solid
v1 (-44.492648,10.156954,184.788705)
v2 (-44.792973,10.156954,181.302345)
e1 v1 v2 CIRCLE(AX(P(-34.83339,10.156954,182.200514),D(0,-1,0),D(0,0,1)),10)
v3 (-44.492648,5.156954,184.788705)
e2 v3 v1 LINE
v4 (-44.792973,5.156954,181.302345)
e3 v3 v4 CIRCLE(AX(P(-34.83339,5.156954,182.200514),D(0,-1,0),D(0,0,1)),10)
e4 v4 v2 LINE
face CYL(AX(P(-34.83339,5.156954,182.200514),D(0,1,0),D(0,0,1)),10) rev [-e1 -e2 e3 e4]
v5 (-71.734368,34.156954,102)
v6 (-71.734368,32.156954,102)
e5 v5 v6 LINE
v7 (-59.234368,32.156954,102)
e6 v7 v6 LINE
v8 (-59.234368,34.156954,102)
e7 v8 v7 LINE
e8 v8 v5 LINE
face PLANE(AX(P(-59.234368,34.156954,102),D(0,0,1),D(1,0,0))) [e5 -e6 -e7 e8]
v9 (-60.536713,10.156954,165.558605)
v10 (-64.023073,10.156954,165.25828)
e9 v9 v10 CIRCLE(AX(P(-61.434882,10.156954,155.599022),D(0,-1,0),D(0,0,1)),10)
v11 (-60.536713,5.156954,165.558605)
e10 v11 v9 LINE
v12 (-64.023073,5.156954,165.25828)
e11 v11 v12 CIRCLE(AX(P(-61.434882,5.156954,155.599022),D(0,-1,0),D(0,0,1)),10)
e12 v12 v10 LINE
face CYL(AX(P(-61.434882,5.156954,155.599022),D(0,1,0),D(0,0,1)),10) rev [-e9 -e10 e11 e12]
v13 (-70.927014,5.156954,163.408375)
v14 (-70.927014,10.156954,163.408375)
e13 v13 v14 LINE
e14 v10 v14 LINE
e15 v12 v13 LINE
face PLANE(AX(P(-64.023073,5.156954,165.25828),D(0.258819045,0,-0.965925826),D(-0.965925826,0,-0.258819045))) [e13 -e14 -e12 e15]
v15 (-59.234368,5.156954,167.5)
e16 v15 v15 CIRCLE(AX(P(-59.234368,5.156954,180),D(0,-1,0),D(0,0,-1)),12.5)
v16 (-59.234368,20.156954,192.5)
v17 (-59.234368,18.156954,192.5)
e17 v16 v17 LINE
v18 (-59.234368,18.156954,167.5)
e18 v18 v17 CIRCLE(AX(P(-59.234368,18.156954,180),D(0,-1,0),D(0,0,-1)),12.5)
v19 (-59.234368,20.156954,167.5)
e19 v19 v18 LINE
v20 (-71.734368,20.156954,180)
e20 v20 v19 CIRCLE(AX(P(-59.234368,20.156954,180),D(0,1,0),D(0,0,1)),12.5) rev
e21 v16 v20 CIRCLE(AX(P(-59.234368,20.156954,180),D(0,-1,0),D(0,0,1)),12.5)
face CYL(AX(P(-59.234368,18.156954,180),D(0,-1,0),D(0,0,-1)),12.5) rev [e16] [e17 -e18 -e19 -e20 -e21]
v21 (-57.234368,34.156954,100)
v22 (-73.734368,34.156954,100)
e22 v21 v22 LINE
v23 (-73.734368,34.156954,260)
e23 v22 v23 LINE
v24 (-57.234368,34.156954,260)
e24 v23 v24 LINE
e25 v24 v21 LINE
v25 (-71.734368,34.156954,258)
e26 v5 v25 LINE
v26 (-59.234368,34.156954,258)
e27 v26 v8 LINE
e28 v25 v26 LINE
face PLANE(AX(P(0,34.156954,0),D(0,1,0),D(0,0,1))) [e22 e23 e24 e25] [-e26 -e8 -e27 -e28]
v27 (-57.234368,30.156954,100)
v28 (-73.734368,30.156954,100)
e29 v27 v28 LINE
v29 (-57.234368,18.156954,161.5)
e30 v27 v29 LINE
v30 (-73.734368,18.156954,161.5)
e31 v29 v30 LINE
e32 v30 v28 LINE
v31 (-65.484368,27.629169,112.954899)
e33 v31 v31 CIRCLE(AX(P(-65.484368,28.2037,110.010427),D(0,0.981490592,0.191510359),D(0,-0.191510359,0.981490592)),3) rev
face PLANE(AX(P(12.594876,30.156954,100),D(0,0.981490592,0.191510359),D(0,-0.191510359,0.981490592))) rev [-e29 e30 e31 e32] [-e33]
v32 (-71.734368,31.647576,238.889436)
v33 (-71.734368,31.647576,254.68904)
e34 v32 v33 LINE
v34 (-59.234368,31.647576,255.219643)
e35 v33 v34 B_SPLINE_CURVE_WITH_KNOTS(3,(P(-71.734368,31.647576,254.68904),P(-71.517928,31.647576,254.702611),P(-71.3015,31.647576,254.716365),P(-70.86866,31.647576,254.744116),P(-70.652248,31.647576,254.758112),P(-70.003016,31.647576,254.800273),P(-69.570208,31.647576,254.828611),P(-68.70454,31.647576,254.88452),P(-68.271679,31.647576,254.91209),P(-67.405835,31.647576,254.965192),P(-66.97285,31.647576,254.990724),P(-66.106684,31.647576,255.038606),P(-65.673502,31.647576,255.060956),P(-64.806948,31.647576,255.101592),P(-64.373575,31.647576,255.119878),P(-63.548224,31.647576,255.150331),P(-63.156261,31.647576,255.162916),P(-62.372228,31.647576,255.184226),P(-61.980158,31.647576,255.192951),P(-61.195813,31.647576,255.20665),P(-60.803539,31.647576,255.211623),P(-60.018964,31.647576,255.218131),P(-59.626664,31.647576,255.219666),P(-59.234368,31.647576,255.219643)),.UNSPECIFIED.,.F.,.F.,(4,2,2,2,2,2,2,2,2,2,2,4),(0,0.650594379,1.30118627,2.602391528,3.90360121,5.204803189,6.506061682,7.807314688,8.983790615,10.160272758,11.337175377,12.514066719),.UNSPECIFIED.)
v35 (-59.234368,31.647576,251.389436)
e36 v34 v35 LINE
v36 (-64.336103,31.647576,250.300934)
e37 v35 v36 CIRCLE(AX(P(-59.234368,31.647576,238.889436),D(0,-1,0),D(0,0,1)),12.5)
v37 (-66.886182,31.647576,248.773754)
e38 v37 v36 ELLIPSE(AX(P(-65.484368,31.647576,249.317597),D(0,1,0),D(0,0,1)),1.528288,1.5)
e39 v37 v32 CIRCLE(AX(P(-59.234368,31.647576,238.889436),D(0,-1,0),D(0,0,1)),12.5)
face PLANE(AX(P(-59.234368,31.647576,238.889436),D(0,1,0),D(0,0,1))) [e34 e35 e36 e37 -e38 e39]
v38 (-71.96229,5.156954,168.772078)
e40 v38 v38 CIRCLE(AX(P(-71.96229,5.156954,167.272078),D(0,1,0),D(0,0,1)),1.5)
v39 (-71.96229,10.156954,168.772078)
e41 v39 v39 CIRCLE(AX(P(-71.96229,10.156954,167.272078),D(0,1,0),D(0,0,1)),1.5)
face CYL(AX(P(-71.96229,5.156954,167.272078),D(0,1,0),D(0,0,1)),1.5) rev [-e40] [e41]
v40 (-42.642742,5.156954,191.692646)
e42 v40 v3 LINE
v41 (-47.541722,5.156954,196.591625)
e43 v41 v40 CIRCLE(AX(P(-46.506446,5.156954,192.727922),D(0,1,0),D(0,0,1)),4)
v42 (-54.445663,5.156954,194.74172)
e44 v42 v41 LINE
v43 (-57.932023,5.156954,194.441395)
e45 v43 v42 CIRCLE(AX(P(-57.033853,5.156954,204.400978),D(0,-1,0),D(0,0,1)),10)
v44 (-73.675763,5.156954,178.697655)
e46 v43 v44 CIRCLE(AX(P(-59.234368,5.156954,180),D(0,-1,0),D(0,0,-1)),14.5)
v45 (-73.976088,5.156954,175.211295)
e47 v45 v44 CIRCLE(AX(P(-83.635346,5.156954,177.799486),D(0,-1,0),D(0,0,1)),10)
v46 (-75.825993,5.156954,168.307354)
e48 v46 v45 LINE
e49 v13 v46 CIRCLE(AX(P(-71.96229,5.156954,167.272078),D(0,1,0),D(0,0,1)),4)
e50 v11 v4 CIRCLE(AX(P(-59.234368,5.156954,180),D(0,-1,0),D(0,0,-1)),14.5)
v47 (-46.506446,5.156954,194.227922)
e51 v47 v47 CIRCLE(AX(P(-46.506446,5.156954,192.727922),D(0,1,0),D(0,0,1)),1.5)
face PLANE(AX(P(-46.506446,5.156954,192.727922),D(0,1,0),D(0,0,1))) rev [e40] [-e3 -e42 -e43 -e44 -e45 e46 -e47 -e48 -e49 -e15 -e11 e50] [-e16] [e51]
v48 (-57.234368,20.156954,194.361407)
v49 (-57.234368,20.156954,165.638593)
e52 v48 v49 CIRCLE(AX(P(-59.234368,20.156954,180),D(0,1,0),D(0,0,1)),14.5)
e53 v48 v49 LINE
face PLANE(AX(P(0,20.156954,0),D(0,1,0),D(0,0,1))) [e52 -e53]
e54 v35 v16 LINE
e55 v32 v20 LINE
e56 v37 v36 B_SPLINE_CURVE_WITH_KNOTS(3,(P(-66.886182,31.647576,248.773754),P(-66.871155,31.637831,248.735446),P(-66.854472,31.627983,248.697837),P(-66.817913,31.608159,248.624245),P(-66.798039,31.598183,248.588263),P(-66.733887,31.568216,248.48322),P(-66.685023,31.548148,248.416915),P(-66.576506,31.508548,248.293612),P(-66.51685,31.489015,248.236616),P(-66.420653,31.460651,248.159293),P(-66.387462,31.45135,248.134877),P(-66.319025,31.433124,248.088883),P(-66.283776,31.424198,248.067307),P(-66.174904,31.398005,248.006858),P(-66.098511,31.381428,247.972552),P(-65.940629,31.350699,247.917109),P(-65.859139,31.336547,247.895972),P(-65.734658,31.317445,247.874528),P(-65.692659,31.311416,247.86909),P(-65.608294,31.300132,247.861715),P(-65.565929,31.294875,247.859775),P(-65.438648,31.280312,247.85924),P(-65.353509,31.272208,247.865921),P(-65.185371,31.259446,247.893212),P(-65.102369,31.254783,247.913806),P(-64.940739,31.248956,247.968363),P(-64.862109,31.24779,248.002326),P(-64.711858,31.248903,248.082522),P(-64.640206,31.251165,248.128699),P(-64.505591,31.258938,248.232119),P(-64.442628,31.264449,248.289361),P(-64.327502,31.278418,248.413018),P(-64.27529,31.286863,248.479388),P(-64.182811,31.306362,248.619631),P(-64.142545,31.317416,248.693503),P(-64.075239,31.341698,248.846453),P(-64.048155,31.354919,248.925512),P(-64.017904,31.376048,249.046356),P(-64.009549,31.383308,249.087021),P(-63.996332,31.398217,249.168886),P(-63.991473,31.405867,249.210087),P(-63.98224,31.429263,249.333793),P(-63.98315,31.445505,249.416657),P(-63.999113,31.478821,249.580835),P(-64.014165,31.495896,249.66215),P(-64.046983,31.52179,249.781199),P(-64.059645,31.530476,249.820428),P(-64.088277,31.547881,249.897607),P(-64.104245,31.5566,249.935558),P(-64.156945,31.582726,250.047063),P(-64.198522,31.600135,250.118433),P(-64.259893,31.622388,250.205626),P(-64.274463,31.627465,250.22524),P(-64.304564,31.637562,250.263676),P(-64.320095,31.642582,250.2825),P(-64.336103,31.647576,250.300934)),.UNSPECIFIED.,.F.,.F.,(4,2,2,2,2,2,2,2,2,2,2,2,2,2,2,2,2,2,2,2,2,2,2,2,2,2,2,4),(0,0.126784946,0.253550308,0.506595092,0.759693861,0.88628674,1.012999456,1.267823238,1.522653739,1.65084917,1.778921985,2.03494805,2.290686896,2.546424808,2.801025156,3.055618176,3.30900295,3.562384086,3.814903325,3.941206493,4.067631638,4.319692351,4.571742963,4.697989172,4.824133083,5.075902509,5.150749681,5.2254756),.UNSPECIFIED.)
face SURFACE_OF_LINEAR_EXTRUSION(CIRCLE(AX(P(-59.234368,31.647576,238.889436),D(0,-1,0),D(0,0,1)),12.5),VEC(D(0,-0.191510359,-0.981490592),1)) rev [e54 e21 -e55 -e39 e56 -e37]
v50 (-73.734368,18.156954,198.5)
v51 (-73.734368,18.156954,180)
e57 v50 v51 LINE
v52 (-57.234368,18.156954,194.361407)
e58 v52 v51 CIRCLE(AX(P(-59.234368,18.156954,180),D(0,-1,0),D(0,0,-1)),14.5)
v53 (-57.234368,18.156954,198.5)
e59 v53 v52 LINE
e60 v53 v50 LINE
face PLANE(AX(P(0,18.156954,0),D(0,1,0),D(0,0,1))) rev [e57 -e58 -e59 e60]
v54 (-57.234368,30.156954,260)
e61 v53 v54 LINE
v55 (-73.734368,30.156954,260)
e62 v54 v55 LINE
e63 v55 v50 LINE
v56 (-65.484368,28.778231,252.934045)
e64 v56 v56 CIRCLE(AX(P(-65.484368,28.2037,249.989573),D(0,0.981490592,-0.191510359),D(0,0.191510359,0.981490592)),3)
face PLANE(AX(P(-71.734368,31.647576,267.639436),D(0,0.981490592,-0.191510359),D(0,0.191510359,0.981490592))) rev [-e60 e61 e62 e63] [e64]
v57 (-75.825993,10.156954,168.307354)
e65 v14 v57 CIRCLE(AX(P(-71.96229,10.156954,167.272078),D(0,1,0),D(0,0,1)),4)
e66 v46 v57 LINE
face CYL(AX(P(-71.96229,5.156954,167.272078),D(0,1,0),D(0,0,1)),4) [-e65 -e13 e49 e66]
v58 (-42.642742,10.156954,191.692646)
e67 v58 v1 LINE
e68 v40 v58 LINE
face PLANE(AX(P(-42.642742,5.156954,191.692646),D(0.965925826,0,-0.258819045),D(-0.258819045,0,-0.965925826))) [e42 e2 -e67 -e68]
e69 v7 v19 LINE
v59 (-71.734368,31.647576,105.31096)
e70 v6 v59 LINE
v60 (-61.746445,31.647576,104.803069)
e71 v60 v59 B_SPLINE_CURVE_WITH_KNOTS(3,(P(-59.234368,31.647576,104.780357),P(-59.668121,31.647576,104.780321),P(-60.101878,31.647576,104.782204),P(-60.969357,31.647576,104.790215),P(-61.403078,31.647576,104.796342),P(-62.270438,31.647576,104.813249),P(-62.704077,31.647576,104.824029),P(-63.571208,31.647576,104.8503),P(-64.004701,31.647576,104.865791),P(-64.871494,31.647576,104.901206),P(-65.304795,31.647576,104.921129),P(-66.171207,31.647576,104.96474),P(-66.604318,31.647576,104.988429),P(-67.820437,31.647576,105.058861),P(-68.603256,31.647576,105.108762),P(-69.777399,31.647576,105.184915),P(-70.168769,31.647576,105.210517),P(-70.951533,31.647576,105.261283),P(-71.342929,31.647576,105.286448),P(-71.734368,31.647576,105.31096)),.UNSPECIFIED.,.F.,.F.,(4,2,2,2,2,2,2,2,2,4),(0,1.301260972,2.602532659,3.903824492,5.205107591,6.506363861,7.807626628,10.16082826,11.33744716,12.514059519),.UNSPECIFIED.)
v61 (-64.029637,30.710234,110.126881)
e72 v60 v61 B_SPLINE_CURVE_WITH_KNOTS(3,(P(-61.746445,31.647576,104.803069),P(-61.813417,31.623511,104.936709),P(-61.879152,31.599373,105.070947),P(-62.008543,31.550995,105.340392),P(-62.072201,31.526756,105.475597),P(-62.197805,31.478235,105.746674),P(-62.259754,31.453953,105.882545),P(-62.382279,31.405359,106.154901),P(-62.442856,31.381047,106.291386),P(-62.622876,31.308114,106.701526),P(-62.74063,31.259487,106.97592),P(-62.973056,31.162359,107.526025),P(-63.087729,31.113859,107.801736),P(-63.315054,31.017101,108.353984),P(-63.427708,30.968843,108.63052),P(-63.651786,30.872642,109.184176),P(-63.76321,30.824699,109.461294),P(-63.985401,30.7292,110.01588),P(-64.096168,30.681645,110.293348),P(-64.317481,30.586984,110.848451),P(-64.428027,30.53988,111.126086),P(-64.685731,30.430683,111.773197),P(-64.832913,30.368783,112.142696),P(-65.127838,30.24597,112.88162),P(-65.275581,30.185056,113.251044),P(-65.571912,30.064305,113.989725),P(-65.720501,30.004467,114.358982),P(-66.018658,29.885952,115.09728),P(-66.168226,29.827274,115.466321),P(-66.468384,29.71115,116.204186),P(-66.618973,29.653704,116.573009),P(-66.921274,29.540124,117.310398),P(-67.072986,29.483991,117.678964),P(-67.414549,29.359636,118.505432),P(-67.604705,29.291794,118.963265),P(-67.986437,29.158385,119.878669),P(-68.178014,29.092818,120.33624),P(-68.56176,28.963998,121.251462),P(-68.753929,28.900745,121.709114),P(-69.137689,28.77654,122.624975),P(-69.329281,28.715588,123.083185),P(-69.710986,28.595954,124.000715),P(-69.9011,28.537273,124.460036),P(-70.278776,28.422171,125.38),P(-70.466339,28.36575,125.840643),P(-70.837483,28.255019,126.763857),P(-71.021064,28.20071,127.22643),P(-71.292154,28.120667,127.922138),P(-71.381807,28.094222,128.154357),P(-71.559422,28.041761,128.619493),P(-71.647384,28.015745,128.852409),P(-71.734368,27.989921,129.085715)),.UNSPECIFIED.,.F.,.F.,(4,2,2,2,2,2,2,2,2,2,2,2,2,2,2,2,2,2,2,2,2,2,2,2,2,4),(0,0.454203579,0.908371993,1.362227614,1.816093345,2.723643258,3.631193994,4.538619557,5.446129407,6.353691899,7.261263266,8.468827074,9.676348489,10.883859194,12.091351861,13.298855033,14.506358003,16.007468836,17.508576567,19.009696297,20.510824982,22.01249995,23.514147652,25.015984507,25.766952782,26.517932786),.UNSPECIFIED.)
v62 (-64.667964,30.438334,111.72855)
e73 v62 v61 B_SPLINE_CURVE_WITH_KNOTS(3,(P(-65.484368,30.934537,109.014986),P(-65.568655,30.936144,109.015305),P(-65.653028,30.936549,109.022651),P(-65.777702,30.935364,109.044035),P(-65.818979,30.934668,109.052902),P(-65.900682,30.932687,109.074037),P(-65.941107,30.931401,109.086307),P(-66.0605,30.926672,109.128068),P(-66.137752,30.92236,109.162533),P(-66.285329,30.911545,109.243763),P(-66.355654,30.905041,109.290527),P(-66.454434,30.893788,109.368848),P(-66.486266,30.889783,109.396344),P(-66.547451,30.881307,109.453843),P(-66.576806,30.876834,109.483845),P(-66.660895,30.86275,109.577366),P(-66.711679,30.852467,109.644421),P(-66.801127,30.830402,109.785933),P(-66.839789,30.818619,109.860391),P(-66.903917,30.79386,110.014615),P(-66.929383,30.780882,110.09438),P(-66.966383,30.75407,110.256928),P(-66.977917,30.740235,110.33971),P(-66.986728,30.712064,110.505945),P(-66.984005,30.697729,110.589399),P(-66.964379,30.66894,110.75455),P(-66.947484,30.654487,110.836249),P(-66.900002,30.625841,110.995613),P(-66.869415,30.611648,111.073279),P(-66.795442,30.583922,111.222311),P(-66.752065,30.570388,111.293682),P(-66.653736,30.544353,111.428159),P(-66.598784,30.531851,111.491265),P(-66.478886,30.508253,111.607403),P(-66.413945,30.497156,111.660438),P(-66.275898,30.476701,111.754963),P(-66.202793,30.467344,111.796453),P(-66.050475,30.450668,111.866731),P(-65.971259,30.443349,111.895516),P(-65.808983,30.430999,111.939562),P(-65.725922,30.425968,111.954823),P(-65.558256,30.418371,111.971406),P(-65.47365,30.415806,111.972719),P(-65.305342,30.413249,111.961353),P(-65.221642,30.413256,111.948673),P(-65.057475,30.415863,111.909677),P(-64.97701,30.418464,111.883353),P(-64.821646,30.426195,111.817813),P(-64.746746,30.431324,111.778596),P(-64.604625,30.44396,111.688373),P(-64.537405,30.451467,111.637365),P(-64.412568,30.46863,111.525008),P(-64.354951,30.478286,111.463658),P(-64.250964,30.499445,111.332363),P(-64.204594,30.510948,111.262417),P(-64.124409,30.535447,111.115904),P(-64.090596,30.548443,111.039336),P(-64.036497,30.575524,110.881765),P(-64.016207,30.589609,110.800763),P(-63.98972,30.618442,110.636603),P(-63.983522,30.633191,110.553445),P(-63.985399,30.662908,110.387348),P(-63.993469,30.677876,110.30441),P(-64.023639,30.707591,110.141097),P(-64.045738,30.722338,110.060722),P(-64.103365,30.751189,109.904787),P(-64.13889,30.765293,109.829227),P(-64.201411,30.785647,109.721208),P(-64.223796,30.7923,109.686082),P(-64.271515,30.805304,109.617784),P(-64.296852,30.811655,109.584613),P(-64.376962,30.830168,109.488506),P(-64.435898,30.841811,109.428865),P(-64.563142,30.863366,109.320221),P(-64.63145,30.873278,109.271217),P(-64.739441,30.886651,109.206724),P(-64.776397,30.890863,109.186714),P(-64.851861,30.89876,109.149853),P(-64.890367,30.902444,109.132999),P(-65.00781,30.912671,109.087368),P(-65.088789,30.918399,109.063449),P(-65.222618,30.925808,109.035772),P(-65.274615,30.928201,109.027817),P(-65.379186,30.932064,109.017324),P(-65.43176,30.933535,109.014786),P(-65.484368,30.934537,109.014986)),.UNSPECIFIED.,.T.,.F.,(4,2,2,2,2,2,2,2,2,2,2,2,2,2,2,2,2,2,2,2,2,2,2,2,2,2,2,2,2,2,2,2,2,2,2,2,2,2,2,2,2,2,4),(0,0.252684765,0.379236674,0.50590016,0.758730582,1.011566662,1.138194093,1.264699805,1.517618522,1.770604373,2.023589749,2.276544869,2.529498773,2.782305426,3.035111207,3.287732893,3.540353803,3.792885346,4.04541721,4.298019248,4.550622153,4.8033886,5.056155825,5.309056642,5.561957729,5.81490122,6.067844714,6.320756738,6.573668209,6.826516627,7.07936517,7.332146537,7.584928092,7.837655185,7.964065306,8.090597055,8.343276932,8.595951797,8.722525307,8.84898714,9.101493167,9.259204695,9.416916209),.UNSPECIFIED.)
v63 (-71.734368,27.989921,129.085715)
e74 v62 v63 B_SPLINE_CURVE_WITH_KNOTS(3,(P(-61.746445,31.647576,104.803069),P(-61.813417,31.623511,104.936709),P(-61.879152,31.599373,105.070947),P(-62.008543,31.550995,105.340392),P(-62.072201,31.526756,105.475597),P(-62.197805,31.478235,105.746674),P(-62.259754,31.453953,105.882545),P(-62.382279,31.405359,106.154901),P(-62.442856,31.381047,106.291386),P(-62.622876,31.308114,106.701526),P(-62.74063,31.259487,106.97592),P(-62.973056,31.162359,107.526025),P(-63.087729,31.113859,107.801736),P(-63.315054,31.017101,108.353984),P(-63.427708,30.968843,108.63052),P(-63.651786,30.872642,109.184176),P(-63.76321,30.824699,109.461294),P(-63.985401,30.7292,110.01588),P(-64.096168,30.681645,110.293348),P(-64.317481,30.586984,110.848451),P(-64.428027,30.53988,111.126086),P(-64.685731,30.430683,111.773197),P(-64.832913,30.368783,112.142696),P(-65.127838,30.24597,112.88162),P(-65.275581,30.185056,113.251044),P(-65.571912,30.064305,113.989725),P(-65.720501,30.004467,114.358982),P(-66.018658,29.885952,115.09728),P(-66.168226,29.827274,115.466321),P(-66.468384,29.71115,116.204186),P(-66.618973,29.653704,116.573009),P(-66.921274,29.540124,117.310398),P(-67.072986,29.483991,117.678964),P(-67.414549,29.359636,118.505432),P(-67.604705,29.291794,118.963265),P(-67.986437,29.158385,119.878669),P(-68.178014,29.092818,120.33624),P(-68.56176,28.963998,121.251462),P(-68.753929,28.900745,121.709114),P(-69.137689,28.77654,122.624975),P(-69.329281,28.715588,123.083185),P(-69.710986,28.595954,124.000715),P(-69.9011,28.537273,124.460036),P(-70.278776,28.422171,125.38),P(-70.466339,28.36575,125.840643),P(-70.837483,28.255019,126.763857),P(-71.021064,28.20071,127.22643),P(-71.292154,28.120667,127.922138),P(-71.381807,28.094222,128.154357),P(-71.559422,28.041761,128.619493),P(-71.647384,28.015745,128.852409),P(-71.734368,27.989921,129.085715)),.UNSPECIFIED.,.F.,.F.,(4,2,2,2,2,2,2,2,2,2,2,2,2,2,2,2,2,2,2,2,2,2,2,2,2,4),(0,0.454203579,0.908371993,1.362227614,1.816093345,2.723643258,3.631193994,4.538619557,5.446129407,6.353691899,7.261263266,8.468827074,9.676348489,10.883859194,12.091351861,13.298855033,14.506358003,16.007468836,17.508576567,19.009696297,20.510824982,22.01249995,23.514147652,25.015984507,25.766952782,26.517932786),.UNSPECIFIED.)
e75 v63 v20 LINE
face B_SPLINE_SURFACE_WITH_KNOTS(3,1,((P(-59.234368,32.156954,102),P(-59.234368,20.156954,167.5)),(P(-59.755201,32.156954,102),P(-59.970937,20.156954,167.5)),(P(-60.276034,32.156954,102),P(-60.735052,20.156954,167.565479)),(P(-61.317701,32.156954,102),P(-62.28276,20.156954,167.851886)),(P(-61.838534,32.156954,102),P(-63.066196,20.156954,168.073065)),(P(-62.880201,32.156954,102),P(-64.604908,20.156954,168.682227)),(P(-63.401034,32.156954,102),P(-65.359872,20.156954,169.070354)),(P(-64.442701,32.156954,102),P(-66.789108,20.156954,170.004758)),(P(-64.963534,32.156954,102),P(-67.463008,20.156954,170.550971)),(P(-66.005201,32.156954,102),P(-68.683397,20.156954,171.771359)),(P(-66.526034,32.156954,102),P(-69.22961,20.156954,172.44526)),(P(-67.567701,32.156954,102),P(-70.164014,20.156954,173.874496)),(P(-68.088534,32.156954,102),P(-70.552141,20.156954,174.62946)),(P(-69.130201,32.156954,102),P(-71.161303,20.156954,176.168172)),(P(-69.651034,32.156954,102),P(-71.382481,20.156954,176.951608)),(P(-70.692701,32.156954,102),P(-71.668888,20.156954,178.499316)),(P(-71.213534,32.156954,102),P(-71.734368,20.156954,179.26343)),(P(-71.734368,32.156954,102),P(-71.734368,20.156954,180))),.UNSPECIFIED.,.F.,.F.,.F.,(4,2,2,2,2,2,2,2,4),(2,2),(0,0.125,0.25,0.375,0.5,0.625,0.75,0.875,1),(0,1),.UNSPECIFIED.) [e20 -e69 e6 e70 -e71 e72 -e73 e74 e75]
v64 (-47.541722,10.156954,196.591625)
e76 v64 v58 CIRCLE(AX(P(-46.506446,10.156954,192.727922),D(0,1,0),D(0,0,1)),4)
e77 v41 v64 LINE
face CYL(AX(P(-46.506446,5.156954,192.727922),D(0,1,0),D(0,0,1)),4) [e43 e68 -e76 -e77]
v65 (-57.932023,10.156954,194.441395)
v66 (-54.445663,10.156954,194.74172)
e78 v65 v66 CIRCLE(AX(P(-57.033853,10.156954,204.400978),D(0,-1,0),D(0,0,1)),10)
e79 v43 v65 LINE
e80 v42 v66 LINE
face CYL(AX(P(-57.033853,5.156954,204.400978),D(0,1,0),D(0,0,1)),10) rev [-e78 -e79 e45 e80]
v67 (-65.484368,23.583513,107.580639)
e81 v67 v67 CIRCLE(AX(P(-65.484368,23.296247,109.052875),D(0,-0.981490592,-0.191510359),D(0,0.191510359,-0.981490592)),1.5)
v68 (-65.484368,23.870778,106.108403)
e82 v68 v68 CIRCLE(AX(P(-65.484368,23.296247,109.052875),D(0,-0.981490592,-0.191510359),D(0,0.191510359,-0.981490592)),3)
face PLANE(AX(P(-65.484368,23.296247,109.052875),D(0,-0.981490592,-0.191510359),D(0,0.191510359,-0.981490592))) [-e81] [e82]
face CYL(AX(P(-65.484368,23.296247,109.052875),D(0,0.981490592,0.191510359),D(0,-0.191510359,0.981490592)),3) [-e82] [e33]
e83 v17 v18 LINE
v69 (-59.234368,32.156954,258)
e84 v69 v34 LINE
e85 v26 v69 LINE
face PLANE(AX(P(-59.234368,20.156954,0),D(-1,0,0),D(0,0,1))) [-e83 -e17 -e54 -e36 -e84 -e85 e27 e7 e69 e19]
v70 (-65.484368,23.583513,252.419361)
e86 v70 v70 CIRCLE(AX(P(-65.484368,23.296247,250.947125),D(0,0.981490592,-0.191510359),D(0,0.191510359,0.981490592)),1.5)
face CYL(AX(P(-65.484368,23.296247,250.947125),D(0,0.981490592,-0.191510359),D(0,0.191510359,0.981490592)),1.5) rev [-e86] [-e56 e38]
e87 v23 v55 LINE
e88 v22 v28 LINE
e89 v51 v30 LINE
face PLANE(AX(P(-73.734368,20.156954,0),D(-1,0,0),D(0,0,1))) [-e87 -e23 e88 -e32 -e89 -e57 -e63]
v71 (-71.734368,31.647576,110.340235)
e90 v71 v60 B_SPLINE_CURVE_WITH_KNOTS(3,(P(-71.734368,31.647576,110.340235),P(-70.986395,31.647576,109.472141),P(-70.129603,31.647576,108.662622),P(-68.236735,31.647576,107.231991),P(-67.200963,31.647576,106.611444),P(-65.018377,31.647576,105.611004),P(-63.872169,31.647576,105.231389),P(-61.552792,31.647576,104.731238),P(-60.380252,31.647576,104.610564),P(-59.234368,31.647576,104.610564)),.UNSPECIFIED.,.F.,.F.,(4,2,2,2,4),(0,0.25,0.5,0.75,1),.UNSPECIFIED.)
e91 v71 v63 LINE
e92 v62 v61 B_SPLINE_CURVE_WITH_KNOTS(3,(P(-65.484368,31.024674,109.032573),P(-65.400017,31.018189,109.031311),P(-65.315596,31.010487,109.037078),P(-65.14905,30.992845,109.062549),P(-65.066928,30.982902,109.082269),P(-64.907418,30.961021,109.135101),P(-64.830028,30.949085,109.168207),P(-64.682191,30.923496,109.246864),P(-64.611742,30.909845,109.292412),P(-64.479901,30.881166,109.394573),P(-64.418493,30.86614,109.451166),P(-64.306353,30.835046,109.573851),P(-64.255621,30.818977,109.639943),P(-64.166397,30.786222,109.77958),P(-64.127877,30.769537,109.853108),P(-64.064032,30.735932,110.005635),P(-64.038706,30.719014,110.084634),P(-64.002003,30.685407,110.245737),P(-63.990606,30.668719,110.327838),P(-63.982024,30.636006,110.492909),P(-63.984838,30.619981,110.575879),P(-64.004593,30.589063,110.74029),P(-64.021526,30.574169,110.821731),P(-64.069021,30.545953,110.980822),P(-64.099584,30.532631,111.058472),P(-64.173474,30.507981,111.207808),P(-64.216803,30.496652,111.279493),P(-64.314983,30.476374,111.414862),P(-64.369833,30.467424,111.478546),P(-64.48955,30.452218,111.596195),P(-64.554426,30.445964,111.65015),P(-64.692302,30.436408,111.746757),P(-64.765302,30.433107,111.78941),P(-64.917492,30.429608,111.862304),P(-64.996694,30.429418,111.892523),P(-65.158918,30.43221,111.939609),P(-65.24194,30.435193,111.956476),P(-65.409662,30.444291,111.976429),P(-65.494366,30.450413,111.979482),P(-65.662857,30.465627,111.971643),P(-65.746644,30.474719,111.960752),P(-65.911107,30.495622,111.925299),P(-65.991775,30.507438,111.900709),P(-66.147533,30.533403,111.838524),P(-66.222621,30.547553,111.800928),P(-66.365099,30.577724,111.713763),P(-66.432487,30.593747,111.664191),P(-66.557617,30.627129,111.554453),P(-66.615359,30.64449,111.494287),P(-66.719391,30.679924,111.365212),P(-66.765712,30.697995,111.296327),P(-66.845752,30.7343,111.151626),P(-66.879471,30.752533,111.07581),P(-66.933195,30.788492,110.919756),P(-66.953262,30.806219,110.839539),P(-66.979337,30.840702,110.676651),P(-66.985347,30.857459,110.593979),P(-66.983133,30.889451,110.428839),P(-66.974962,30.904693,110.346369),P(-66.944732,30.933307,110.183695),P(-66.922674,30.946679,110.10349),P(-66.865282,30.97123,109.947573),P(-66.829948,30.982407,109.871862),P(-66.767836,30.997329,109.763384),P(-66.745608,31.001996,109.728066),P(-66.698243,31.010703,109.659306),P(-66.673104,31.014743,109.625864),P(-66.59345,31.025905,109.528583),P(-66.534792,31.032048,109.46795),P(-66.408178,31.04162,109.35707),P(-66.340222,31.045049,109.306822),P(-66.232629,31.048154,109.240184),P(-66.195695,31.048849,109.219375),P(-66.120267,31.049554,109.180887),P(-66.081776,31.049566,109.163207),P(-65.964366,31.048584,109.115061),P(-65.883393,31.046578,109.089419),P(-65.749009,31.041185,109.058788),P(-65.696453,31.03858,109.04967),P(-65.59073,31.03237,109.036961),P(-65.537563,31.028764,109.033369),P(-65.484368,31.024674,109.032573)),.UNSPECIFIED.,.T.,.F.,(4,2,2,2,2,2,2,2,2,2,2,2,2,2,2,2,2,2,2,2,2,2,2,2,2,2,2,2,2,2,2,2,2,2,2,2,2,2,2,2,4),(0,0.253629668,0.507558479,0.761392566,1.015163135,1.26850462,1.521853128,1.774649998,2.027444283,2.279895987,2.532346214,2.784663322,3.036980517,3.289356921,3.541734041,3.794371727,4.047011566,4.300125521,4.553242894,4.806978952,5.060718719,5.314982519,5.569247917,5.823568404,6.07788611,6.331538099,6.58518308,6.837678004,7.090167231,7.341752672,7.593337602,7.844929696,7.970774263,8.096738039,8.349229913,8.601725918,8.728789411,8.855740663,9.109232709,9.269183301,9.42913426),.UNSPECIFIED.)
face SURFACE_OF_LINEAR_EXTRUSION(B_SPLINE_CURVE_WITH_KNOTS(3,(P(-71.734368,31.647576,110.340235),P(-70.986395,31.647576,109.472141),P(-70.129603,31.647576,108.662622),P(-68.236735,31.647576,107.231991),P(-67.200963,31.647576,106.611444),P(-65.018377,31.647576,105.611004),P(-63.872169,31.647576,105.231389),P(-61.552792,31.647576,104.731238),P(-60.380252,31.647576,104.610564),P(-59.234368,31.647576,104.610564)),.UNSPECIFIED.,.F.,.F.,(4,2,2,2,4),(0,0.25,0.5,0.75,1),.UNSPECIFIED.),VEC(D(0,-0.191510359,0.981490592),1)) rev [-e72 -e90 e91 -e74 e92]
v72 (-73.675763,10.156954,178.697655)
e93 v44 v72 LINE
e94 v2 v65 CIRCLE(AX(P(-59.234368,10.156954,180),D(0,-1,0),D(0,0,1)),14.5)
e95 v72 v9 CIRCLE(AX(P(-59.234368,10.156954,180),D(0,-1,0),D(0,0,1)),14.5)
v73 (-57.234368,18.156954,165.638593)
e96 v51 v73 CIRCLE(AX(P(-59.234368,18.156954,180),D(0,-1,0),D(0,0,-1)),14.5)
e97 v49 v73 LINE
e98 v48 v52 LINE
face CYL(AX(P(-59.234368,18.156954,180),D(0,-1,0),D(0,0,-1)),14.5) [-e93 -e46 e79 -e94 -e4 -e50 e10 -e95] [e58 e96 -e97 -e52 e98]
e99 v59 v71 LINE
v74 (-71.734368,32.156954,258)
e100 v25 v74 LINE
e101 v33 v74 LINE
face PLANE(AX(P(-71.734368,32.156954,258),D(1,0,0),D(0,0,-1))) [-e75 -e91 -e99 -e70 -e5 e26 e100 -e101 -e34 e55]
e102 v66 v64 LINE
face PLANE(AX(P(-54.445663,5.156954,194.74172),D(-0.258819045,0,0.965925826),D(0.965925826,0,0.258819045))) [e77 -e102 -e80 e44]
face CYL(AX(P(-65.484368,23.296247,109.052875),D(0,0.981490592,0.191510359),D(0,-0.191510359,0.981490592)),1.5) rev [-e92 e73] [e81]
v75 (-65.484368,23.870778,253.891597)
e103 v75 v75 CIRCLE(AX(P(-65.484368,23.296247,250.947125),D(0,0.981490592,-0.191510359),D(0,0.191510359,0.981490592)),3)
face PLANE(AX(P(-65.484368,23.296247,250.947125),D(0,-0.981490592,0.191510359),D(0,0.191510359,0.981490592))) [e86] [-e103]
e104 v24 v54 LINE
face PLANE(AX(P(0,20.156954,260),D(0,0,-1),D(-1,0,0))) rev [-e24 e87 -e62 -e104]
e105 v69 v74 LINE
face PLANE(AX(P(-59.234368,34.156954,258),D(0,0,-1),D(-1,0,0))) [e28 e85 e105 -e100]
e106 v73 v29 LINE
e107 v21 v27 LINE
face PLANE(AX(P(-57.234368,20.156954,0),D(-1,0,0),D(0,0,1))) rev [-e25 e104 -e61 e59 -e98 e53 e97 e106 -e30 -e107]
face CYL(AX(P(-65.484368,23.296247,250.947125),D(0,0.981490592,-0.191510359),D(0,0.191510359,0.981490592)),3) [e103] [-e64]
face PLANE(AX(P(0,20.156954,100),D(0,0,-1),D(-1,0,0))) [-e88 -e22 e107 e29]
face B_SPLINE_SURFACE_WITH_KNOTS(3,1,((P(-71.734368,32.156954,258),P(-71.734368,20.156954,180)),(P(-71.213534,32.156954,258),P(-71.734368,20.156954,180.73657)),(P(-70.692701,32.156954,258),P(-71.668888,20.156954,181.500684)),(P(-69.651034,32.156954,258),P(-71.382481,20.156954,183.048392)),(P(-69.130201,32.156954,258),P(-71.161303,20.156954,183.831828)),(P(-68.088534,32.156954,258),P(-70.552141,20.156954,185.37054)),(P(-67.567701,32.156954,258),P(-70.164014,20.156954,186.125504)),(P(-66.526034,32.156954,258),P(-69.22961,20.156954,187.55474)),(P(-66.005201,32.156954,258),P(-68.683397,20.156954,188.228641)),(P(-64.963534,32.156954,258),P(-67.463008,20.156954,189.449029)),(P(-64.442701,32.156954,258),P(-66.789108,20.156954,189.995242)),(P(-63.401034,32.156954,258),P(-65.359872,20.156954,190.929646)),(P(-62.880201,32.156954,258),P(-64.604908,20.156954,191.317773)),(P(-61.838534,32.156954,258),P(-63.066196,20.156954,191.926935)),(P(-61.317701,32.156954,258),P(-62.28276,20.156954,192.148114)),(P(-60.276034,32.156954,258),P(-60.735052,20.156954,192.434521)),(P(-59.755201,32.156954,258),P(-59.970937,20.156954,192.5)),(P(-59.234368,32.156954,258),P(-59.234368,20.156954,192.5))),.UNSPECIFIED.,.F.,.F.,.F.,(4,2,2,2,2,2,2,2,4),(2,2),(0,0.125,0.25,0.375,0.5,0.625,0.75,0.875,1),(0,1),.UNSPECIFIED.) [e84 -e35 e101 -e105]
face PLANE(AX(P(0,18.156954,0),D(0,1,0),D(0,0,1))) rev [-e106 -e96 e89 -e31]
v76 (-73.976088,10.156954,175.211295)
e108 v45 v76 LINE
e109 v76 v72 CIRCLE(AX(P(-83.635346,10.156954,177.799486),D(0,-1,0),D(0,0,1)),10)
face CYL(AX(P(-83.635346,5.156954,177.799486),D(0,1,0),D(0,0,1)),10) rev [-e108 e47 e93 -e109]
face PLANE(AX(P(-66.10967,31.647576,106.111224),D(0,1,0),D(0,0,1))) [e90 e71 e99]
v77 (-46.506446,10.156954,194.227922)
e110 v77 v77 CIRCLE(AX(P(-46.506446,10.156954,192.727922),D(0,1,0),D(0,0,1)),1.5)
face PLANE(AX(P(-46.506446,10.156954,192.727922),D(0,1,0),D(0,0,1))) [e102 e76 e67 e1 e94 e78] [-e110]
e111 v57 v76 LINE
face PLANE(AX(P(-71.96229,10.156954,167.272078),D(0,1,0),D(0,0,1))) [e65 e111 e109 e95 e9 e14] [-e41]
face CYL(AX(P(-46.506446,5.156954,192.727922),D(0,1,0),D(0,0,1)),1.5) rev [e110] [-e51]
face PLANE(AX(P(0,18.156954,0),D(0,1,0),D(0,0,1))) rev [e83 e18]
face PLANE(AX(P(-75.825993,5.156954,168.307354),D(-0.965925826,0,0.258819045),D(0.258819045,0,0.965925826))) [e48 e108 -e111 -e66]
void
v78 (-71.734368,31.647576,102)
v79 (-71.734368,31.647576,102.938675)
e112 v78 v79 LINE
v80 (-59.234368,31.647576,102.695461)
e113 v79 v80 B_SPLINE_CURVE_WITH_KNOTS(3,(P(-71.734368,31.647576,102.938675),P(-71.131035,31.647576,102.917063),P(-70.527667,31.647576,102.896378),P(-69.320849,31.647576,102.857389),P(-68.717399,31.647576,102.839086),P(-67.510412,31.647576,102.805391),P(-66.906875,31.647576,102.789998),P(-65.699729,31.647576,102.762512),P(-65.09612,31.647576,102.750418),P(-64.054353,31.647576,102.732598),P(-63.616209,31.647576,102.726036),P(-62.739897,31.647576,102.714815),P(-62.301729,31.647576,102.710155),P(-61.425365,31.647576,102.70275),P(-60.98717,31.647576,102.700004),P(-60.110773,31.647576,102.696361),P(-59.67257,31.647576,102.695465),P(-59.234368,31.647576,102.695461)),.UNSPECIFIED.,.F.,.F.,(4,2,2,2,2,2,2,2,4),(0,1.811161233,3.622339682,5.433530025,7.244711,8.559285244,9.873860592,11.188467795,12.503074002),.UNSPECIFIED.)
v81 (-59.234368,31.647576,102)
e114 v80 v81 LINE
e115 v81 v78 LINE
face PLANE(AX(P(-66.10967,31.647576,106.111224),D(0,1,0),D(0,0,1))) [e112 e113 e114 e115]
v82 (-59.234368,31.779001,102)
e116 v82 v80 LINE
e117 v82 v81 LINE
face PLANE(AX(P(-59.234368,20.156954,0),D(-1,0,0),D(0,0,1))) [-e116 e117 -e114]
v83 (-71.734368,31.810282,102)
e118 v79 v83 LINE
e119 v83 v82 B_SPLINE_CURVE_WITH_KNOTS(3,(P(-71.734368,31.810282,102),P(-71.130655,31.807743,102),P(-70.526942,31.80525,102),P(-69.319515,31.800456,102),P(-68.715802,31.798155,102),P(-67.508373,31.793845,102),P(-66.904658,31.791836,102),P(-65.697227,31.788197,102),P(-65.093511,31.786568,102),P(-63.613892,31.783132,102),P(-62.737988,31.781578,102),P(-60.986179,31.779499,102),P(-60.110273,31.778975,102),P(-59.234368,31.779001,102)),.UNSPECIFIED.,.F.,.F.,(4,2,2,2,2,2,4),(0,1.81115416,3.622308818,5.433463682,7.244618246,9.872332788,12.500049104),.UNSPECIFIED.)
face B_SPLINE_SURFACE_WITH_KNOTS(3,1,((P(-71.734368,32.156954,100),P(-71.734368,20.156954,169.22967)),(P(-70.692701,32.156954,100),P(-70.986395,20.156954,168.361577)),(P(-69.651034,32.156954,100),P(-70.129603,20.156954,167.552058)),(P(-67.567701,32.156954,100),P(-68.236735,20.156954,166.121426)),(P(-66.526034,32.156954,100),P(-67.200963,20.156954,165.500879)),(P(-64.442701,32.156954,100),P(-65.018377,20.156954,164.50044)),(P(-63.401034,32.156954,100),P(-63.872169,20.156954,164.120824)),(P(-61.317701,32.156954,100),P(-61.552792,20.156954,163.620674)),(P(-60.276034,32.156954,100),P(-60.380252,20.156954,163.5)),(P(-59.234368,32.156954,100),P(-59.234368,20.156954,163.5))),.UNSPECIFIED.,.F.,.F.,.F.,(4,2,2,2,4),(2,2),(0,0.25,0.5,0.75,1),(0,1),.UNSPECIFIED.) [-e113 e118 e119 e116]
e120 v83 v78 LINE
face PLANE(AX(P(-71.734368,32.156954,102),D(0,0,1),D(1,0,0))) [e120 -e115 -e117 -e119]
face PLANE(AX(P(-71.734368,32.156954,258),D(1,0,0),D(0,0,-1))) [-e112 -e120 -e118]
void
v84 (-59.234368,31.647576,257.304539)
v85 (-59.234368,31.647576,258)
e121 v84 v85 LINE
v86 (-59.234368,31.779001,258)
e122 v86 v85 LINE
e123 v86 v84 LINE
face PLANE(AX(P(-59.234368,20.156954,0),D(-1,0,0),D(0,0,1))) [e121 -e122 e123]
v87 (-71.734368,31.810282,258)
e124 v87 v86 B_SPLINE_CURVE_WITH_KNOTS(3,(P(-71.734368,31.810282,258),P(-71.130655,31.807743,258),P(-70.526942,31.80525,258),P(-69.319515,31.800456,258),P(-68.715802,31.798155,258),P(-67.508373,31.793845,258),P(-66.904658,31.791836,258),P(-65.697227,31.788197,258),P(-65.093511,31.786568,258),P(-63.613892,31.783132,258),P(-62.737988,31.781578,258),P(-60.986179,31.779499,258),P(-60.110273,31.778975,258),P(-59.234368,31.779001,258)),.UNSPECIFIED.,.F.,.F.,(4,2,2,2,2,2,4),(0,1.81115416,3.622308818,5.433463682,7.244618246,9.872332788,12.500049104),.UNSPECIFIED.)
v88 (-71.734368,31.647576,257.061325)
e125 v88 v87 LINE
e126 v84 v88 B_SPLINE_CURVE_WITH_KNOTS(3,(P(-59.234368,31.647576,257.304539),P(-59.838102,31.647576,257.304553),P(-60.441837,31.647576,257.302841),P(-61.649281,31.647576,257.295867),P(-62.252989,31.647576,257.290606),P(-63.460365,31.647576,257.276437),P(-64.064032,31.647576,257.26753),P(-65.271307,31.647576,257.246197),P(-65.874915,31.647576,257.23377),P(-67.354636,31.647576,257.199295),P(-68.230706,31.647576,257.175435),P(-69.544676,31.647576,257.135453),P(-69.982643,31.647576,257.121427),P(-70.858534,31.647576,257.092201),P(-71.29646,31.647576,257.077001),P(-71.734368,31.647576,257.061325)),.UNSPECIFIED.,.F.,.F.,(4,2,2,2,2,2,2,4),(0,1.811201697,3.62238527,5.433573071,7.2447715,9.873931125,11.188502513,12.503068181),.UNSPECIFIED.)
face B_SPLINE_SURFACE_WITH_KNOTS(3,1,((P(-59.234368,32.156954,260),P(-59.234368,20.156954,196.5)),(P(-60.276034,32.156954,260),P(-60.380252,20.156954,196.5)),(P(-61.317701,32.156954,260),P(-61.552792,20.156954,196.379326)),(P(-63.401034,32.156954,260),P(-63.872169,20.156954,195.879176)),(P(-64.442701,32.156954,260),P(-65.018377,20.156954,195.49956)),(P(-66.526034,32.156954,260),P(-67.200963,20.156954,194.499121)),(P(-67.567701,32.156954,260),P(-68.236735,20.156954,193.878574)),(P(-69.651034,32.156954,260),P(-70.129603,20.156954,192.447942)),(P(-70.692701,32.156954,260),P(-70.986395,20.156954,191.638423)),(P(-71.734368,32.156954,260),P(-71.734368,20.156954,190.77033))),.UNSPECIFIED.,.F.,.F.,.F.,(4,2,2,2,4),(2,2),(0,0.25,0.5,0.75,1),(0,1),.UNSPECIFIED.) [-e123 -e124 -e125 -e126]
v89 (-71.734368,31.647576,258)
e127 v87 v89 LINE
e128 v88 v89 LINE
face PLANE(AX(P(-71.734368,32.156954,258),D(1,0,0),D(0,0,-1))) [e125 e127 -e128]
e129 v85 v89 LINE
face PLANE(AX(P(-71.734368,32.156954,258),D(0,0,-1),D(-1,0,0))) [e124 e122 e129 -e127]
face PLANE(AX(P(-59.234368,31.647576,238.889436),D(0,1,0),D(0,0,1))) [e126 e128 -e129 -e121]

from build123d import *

# Parameters (mm, degrees)
EXTRUDE_START         = -5
EXTRUDE_1_OUTLINE_R   = 1.5
EXTRUDE_1_DEPTH       = 5
EXTRUDE_1_2_OUTLINE_R = 1.5
EXTRUDE_1_2_DEPTH     = 5
SKETCH_2_R            = 14.5
SKETCH_2_R_2          = 12.5
EXTRUDE_2_DEPTH       = 13
SKETCH_3_R            = 14.5
SKETCH_3_R_2          = 12.5
EXTRUDE_5_DEPTH       = 2
SKETCH_4_W            = 16.5
SKETCH_4_H            = 160
SKETCH_4_W_2          = 12.5
SKETCH_4_H_2          = 156
EXTRUDE_4_DEPTH       = 12
CUT_EXTRUDE_1_REACH   = 265.836
EXTRUDE_6_DEPTH       = 60
EXTRUDE_7_DEPTH       = 60
SKETCH_12_W           = 16.582102221
SKETCH_12_H           = 6.424530869
SKETCH_12_W_2         = 10.745747925
SKETCH_12_H_2         = 9.027697981
CUT_EXTRUDE_2_DEPTH   = 60
SKETCH_14_W           = 16.5
SKETCH_14_H           = 160
SKETCH_14_W_2         = 12.5
SKETCH_14_H_2         = 156
EXTRUDE_8_DEPTH       = 2
SKETCH_16_R           = 3
SKETCH_16_R_2         = 1.5
EXTRUDE_9_DEPTH       = 5
CUT_EXTRUDE_START     = -5
SKETCH_17_R           = 1.5
CUT_EXTRUDE_3_DEPTH   = 5
SKETCH_18_R           = 1.5
CUT_EXTRUDE_4_DEPTH   = 5


with BuildPart() as part:
    # 填料-伸長1: read off the stored shape, not the designer's step
    # 填料-伸長1 outline → 填料-伸長1 (new body)
    with BuildSketch(Plane(origin=(0, 10.156954032, 0), x_dir=(1, 0, 0), z_dir=(0, 1, 0)).offset(EXTRUDE_START)):
        with BuildLine():
            Line((-54.445663034, -194.741719927), (-47.541721945, -196.591625367))
            ThreePointArc((-47.541721945, -196.591625367), (-43.67801864, -195.556349186), (-42.64274246, -191.692645881))
            Line((-42.64274246, -191.692645881), (-44.492647899, -184.788704792))
            ThreePointArc((-44.492647899, -184.788704792), (-44.796491977, -183.058763578), (-44.792972571, -181.302345222))
            ThreePointArc((-44.792972571, -181.302345222), (-48.981319499, -190.253048327), (-57.932022604, -194.441395255))
            ThreePointArc((-57.932022604, -194.441395255), (-56.175604248, -194.43787585), (-54.445663034, -194.741719927))
        make_face()
        with Locations((-46.506445765, -192.727922061)):
            Circle(EXTRUDE_1_OUTLINE_R, mode=Mode.SUBTRACT)
    extrude(amount=EXTRUDE_1_DEPTH)



with BuildPart() as body_2:
    # Extrude 1 2 outline → Extrude 1 2 (new body)
    with BuildSketch(Plane(origin=(0, 10.156954032, 0), x_dir=(1, 0, 0), z_dir=(0, 1, 0)).offset(EXTRUDE_START)):
        with BuildLine():
            Line((-64.023072619, -165.258280073), (-70.927013707, -163.408374633))
            ThreePointArc((-70.927013707, -163.408374633), (-74.790717013, -164.443650813), (-75.825993193, -168.307354119))
            Line((-75.825993193, -168.307354119), (-73.976087754, -175.211295208))
            ThreePointArc((-73.976087754, -175.211295208), (-73.672243676, -176.941236422), (-73.675763082, -178.697654778))
            ThreePointArc((-73.675763082, -178.697654778), (-69.487416154, -169.746951673), (-60.536713049, -165.558604745))
            ThreePointArc((-60.536713049, -165.558604745), (-62.293131405, -165.56212415), (-64.023072619, -165.258280073))
        make_face()
        with Locations((-71.962289888, -167.272077939)):
            Circle(EXTRUDE_1_2_OUTLINE_R, mode=Mode.SUBTRACT)
    extrude(amount=EXTRUDE_1_2_DEPTH)


with BuildPart() as part_1:
    add(part.part)

    add(body_2.part)  # 填料-伸長2 merges body 2
    # 草圖2 → 填料-伸長2 (add)
    with BuildSketch(Plane.XZ.offset(-5.156954032)):
        with Locations(Location((-59.234367826, 180, 0), (0, 0, 270))):
            Circle(SKETCH_2_R)
        with Locations(Location((-59.234367826, 180, 0), (0, 0, 270))):
            Circle(SKETCH_2_R_2, mode=Mode.SUBTRACT)
    extrude(amount=-EXTRUDE_2_DEPTH)

    # 草圖3 → 填料-伸長5 (add)
    # profile 1 of 4: a face of its own
    with BuildSketch(Plane(origin=(0, 18.156954032, 0), x_dir=(1, 0, 0), z_dir=(0, 1, 0))):
        with Locations(Location((-59.234367826, -180, 0), (0, 0, 95.153074257))):
            Circle(SKETCH_3_R)
        with Locations(Location((-59.234367826, -180, 0), (0, 0, 90))):
            Circle(SKETCH_3_R_2, mode=Mode.SUBTRACT)
    # profile 2 of 4: a face of its own
    with BuildSketch(Plane(origin=(0, 18.156954032, 0), x_dir=(1, 0, 0), z_dir=(0, 1, 0))):
        with BuildLine():
            Line((-73.734367826, -180), (-73.734367826, -260))
            Line((-73.734367826, -260), (-57.234367826, -260))
            Line((-57.234367826, -260), (-57.234367826, -194.361406616))
            ThreePointArc((-57.234367826, -194.361406616), (-68.754084209, -190.937321427), (-73.734367826, -180))
        make_face()
    # profile 3 of 4: a face of its own
    with BuildSketch(Plane(origin=(0, 18.156954032, 0), x_dir=(1, 0, 0), z_dir=(0, 1, 0))):
        with BuildLine():
            Line((-73.734367826, -100), (-73.734367826, -180))
            ThreePointArc((-73.734367826, -180), (-68.754084209, -169.062678573), (-57.234367826, -165.638593384))
            Line((-57.234367826, -165.638593384), (-57.234367826, -100))
            Line((-57.234367826, -100), (-73.734367826, -100))
        make_face()
    # profile 4 of 4: a face of its own
    with BuildSketch(Plane(origin=(0, 18.156954032, 0), x_dir=(1, 0, 0), z_dir=(0, 1, 0))):
        with BuildLine():
            Line((-59.234367826, -167.5), (-59.234367826, -192.5))
            ThreePointArc((-59.234367826, -192.5), (-50.395533062, -188.838834765), (-46.734367826, -180))
            ThreePointArc((-46.734367826, -180), (-50.395533062, -171.161165235), (-59.234367826, -167.5))
        make_face()
    extrude(amount=EXTRUDE_5_DEPTH)

    # 草圖4 → 填料-伸長4 (add)
    with BuildSketch(Plane(origin=(0, 20.156954032, 0), x_dir=(1, 0, 0), z_dir=(0, 1, 0))):
        with Locations((-65.484367826, -180)):
            Rectangle(SKETCH_4_W, SKETCH_4_H)
        with Locations((-65.484367826, -180)):
            Rectangle(SKETCH_4_W_2, SKETCH_4_H_2, mode=Mode.SUBTRACT)
    extrude(amount=EXTRUDE_4_DEPTH)

    # 除料-伸長1: up to this face of the body (flat: up to its plane)
    cut_extrude_1_end = Plane(part_1.part.faces().sort_by_distance((-57.234367826, 26.156954032, 180))[0])
    # 草圖7 → 除料-伸長1 (cut, up to the picked face)
    with BuildSketch(Plane.ZY.offset(73.734367826), mode=Mode.PRIVATE) as cut_extrude_1_sk1:
        Polygon((260, 30.156954032), (198.5, 18.156954032), (264.047822103, 13.706220506), (266.363809243, 29.164088167), align=None)
    cut_extrude_1_tool1 = split(extrude(cut_extrude_1_sk1.sketch, amount=-CUT_EXTRUDE_1_REACH, mode=Mode.PRIVATE), bisect_by=cut_extrude_1_end, keep=Keep.BOTH, mode=Mode.PRIVATE)
    # 草圖7 → 除料-伸長1 (cut, up to the picked face)
    with BuildSketch(Plane.ZY.offset(73.734367826), mode=Mode.PRIVATE) as cut_extrude_1_sk2:
        Polygon((95.952177897, 13.706220506), (93.636190757, 29.164088167), (100, 30.156954032), (161.5, 18.156954032), align=None)
    cut_extrude_1_tool2 = split(extrude(cut_extrude_1_sk2.sketch, amount=-CUT_EXTRUDE_1_REACH, mode=Mode.PRIVATE), bisect_by=cut_extrude_1_end, keep=Keep.BOTH, mode=Mode.PRIVATE)
    add(cut_extrude_1_tool1.solids().sort_by(Axis((-73.734368, 20.991529, 242.810826), (1, 0, 0)))[0], mode=Mode.SUBTRACT)
    add(cut_extrude_1_tool2.solids().sort_by(Axis((-73.734368, 20.991529, 117.189174), (1, 0, 0)))[0], mode=Mode.SUBTRACT)



with BuildPart() as body_2_2:
    # 草圖5 → 疊層拉伸1 section 0
    with BuildSketch(Plane(origin=(0, 32.156954032, 0), x_dir=(1, 0, 0), z_dir=(0, 1, 0))):
        with BuildLine():
            Line((-71.734367826, -258), (-59.234367826, -258))
            Line((-59.234367826, -258), (-59.234367826, -260))
            Line((-59.234367826, -260), (-71.734367826, -260))
            Line((-71.734367826, -260), (-71.734367826, -258))
        make_face()
    # 草圖6 for 疊層拉伸1 → 疊層拉伸1 section 1
    with BuildSketch(Plane(origin=(0, 20.156954032, 0), x_dir=(1, 0, 0), z_dir=(0, 1, 0))):
        with BuildLine():
            Line((-71.734367826, -180), (-71.734367826, -190.770329614))
            # circular arc as an exact rational Bezier (weights 1, cos(half-angle), 1)
            Bezier((-71.734367826, -190.770329614), (-66.797532736, -196.5), (-59.234367826, -196.5), weights=[1, 0.909050947, 1])
            Line((-59.234367826, -196.5), (-59.234367826, -192.5))
            Bezier((-59.234367826, -192.5), (-71.734367826, -192.5), (-71.734367826, -180), weights=[1, 0.707106781, 1])
        make_face()
    loft()


with BuildPart() as part_2:
    add(part_1.part)

    add(body_2_2.part)  # 填料-伸長6 merges body 2 2
    # 草圖8 → 填料-伸長6 (add, along a direction that is not the sketch's normal)
    with BuildSketch(Plane(origin=(0, 20.156954032, 0), x_dir=(1, 0, 0), z_dir=(0, 1, 0))):
        with BuildLine():
            Line((-71.734367826, -208.75), (-59.234367826, -208.75))
            Line((-59.234367826, -208.75), (-59.234367826, -192.5))
            ThreePointArc((-59.234367826, -192.5), (-68.073202591, -188.838834765), (-71.734367826, -180))
            Line((-71.734367826, -180), (-71.734367826, -208.75))
        make_face()
    extrude(amount=EXTRUDE_6_DEPTH, dir=(-6.810459085749413e-15, 0.1915103594196487, 0.9814905920256991))

    # 草圖10 → 疊層拉伸2 section 0
    with BuildSketch(Plane(origin=(0, 32.156954032, 0), x_dir=(1, 0, 0), z_dir=(0, 1, 0))):
        with BuildLine():
            Line((-71.734367826, -102), (-59.234367826, -102))
            Line((-59.234367826, -102), (-59.234367826, -100))
            Line((-59.234367826, -100), (-71.734367826, -100))
            Line((-71.734367826, -100), (-71.734367826, -102))
        make_face()
    # 草圖9 for 疊層拉伸2 → 疊層拉伸2 section 1
    with BuildSketch(Plane(origin=(0, 20.156954032, 0), x_dir=(1, 0, 0), z_dir=(0, 1, 0))):
        with BuildLine():
            Line((-71.734367826, -180), (-71.734367826, -169.229670386))
            Bezier((-71.734367826, -169.229670386), (-66.797532736, -163.5), (-59.234367826, -163.5), weights=[1, 0.909050947, 1])
            Line((-59.234367826, -163.5), (-59.234367826, -167.5))
            Bezier((-59.234367826, -167.5), (-71.734367826, -167.5), (-71.734367826, -180), weights=[1, 0.707106781, 1])
        make_face()
    loft()

    # 草圖11 → 填料-伸長7 (add, along a direction that is not the sketch's normal)
    with BuildSketch(Plane(origin=(0, 20.156954032, 0), x_dir=(1, 0, 0), z_dir=(0, 1, 0))):
        with BuildLine():
            Line((-71.734367826, -151.25), (-71.734367826, -169.229670386))
            add(Edge.make_bspline(
                [(-71.734367826, -169.229670386), (-70.98639539, -168.36157667), (-70.129603224, -167.552057992), (-68.236734624, -166.121426347), (-67.200962736, -165.500879161), (-65.018377367, -164.50043958), (-63.872168611, -164.120824376), (-61.552791986, -163.620673884), (-60.380251531, -163.5), (-59.234367826, -163.5)],
                knots=[0, 0, 0, 0, 0.25, 0.25, 0.5, 0.5, 0.75, 0.75, 1, 1, 1, 1], degree=3))
            Line((-59.234367826, -163.5), (-59.234367826, -151.25))
            Line((-59.234367826, -151.25), (-71.734367826, -151.25))
        make_face()
    extrude(amount=EXTRUDE_7_DEPTH, dir=(0, 0.1915103594196487, -0.9814905920256991))

    # 草圖12 → 除料-伸長2 (cut)
    with BuildSketch(Plane(origin=(-57.234367826, 0, 0), x_dir=(0, 0, -1), z_dir=(1, 0, 0))):
        with Locations((-91.708948889, 28.944688598)):
            Rectangle(SKETCH_12_W, SKETCH_12_H)
        with Locations((-265.372873962, 27.643105042)):
            Rectangle(SKETCH_12_W_2, SKETCH_12_H_2)
    extrude(amount=-CUT_EXTRUDE_2_DEPTH, mode=Mode.SUBTRACT)

    # 草圖14 → 填料-伸長8 (add)
    with BuildSketch(Plane(origin=(0, 32.156954032, 0), x_dir=(1, 0, 0), z_dir=(0, 1, 0))):
        with Locations((-65.484367826, -180)):
            Rectangle(SKETCH_14_W, SKETCH_14_H)
        with Locations((-65.484367826, -180)):
            Rectangle(SKETCH_14_W_2, SKETCH_14_H_2, mode=Mode.SUBTRACT)
    extrude(amount=EXTRUDE_8_DEPTH)

    # 草圖16 → 填料-伸長9 (add)
    with BuildSketch(Plane(origin=(0, 47.847472623, 9.336092219), x_dir=(1, 0, 0), z_dir=(0, -0.981490592025699, -0.19151035941964872))):
        with Locations(Location((-65.484367826, 102.572898444, 0), (0, 0, 90))):
            Circle(SKETCH_16_R)
        with Locations(Location((-65.484367826, 102.572898444, 0), (0, 0, 270))):
            Circle(SKETCH_16_R_2, mode=Mode.SUBTRACT)
    extrude_9 = extrude(amount=EXTRUDE_9_DEPTH)

    # 草圖17 → 除料-伸長3 (cut)
    with BuildSketch(Plane(origin=(0, 47.847472623, 9.336092219), x_dir=(1, 0, 0), z_dir=(0, -0.981490592025699, -0.19151035941964872)).offset(CUT_EXTRUDE_START)):
        with Locations(Location((-65.484367826, 102.572898444, 0), (0, 0, 57.025282915))):
            Circle(SKETCH_17_R)
    extrude(amount=CUT_EXTRUDE_3_DEPTH, mode=Mode.SUBTRACT)

    # 鏡射1: 填料-伸長9 across plane
    add(extrude_9.mirror(Plane(origin=(0, 0, 180), x_dir=(1, 0, 0), z_dir=(0, 0, -1))))

    # 草圖18 → 除料-伸長4 (cut)
    with BuildSketch(Plane(origin=(0, -19.820149153, 3.867346176), x_dir=(1, 0, 0), z_dir=(-4.422479578024356e-14, -0.981490592025698, 0.1915103594196541)).offset(CUT_EXTRUDE_START)):
        with Locations(Location((-65.484367826, 250.763714686, 0), (0, 0, 90))):
            Circle(SKETCH_18_R)
    extrude(amount=CUT_EXTRUDE_4_DEPTH, mode=Mode.SUBTRACT)


solid = part_2.part
